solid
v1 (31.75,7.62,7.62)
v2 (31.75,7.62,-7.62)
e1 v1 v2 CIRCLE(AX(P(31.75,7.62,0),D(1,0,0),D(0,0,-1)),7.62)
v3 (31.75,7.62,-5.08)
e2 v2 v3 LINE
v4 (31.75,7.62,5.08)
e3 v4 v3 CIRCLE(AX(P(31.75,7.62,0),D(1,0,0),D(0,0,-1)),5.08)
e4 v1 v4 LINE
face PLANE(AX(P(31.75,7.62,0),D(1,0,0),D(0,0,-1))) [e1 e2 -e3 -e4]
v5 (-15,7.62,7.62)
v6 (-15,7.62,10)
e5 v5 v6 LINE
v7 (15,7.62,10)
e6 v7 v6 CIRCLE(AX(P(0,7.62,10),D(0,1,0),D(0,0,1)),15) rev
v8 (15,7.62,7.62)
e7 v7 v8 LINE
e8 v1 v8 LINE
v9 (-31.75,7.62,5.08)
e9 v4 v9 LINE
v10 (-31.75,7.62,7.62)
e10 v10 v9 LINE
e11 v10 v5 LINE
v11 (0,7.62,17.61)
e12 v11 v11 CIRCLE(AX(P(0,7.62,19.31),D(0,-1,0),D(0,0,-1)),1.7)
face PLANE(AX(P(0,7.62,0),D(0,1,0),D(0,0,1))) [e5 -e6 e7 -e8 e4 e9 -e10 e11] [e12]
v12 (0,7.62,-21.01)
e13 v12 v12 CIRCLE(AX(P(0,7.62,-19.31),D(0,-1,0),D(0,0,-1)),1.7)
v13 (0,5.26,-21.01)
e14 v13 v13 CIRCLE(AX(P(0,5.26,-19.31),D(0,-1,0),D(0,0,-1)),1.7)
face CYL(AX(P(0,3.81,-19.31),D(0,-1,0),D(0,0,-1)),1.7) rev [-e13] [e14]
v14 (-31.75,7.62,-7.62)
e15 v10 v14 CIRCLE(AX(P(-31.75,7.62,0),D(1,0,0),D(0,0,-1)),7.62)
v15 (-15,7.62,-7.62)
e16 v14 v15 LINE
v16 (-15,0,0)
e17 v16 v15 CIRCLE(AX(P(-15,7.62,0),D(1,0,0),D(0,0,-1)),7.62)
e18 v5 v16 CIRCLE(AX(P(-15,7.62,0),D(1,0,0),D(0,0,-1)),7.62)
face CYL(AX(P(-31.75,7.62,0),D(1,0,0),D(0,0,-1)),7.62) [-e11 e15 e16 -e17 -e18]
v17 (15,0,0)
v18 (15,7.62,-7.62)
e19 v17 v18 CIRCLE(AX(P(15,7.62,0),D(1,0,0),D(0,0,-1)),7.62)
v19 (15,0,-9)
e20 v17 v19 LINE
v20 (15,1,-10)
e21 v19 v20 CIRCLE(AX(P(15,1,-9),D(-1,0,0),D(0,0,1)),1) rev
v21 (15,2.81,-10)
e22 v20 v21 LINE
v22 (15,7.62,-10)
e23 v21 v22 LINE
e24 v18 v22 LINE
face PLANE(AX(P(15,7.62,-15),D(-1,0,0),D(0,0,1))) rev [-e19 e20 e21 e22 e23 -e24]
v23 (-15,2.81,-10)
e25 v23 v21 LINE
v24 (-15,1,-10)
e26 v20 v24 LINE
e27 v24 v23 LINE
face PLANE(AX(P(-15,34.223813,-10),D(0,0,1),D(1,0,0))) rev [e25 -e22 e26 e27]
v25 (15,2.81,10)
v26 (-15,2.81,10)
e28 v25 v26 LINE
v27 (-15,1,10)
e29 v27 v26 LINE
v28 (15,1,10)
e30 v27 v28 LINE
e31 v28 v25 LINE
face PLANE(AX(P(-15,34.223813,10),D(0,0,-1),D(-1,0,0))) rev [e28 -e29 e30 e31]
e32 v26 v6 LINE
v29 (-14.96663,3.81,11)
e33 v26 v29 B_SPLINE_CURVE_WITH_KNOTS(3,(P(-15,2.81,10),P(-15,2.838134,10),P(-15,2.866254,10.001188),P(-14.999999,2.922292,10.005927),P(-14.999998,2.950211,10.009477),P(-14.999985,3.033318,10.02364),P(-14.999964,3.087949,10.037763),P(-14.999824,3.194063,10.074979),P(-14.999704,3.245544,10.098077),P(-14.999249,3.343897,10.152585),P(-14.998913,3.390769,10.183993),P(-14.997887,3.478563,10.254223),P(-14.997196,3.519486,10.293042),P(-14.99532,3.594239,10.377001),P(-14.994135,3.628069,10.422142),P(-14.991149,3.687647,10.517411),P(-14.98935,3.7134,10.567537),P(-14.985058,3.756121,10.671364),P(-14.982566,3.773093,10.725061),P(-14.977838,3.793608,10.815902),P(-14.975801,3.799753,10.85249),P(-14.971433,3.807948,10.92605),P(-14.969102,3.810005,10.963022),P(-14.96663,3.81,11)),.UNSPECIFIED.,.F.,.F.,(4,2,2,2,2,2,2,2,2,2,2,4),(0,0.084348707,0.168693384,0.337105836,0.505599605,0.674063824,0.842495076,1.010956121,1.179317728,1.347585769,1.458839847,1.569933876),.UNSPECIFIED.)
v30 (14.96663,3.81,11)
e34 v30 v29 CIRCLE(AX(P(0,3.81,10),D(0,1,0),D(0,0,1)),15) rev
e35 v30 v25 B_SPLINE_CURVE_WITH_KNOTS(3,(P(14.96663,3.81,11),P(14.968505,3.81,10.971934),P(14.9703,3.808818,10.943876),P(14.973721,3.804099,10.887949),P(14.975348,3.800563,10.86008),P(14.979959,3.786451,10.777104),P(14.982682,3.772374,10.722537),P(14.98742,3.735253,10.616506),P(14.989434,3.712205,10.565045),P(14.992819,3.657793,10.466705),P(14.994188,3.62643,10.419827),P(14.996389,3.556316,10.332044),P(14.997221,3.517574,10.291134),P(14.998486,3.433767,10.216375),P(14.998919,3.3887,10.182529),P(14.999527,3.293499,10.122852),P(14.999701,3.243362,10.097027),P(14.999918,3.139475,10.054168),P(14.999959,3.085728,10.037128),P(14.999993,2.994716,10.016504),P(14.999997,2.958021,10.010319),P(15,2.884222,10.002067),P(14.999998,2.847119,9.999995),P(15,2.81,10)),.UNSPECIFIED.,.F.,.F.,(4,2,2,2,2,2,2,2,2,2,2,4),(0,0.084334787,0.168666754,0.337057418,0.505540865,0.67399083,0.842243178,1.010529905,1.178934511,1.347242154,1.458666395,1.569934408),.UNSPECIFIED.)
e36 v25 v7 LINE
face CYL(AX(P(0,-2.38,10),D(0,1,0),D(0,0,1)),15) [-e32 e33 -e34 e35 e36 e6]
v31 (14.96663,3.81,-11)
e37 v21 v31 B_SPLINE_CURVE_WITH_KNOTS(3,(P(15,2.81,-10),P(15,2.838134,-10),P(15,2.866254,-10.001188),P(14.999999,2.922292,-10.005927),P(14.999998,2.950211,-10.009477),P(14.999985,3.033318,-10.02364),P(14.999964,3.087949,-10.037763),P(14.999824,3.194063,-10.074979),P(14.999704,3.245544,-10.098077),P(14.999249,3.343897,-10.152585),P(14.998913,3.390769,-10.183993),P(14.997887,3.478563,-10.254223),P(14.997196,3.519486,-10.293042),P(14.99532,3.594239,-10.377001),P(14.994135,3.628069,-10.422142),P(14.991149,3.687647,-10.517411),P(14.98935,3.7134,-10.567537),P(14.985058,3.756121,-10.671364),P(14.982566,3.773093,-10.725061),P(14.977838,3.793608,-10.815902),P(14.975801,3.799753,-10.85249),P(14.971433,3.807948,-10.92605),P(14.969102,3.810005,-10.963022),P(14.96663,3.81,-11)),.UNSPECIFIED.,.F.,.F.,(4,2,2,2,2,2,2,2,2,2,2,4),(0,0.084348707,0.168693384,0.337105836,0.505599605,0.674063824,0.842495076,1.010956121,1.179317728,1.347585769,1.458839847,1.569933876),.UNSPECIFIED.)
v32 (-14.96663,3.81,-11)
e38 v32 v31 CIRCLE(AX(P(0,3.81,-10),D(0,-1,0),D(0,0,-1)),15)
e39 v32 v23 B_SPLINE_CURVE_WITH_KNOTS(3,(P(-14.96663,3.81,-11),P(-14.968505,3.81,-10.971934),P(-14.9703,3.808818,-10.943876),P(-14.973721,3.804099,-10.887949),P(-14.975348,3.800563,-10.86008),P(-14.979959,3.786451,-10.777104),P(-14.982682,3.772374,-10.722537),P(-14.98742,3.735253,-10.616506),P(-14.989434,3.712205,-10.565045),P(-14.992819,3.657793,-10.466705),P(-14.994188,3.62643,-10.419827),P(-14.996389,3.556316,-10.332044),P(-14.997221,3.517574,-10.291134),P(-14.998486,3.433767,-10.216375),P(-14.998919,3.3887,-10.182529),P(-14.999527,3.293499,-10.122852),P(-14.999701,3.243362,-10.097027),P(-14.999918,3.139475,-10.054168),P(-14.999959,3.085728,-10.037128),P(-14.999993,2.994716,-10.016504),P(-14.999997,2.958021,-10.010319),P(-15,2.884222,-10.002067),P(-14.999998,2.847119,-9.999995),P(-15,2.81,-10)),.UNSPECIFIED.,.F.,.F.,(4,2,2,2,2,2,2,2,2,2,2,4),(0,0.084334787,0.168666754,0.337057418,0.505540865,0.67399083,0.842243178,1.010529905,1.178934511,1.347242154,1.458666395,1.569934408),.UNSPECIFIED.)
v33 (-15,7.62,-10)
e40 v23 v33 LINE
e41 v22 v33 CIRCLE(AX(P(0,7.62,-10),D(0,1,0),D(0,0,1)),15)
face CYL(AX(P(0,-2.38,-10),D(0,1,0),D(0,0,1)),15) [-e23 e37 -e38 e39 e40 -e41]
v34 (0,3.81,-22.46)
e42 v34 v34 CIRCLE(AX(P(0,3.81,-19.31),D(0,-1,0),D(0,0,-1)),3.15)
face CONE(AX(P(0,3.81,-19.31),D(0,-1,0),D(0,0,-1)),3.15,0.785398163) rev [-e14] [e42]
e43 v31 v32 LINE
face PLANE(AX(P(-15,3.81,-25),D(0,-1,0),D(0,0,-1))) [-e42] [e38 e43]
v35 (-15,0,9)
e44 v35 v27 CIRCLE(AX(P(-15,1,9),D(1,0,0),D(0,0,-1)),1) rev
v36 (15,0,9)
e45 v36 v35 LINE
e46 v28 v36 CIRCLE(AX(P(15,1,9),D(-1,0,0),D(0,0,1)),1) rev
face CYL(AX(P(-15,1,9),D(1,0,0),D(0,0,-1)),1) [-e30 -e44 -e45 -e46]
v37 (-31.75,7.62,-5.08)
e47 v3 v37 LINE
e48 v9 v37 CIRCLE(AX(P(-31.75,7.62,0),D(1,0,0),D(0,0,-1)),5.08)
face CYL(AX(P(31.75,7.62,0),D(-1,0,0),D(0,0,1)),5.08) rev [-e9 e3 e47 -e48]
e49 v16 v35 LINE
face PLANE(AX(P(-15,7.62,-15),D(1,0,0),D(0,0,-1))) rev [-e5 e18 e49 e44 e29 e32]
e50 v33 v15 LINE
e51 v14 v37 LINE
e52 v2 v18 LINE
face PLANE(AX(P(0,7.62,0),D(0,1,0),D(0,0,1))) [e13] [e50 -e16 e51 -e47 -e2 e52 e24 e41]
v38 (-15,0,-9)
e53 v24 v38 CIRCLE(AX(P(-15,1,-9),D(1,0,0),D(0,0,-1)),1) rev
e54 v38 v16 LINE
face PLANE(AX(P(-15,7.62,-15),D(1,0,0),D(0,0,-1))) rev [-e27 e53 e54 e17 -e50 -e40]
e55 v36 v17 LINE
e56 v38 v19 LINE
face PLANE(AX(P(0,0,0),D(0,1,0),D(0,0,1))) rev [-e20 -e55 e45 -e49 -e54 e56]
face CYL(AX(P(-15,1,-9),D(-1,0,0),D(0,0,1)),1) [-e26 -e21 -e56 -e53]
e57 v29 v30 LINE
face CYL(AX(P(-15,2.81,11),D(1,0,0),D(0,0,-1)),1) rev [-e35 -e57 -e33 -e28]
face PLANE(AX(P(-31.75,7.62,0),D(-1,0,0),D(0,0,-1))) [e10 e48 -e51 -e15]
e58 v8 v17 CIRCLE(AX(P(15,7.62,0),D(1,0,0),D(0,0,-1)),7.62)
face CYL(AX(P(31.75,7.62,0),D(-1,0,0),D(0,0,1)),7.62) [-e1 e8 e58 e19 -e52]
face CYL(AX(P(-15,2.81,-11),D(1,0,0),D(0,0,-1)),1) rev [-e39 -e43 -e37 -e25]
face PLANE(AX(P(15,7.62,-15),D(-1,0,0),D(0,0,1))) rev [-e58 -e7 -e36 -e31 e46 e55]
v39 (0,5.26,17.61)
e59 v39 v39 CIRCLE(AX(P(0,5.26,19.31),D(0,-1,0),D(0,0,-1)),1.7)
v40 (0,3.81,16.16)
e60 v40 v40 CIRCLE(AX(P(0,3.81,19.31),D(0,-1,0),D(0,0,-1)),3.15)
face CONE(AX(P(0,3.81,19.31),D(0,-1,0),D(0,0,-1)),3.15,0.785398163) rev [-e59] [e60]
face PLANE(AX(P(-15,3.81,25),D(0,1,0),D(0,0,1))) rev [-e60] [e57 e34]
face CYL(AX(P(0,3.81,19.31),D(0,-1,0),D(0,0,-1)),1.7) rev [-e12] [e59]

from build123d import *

# Parameters (mm, degrees)
SKETCH1_W                                           = 30
SKETCH1_H                                           = 30
BOSS_EXTRUDE1_DEPTH                                 = 7.62
BOSS_EXTRUDE2_DEPTH                                 = 16.75
CUT_EXTRUDE2_DEPTH                                  = 35.39570322
SKETCH3_W                                           = 30
SKETCH3_H                                           = 3.81
BOSS_EXTRUDE3_DEPTH                                 = 10
CSK_FOR_M3_COUNTERSUNK_FLAT_HEAD_SCREW1_D           = 3.4
CSK_FOR_M3_COUNTERSUNK_FLAT_HEAD_SCREW1_CSINK_D     = 6.3
CSK_FOR_M3_COUNTERSUNK_FLAT_HEAD_SCREW1_CSINK_ANGLE = 90
CUT_EXTRUDE3_START                                  = -10
CUT_EXTRUDE3_DEPTH                                  = 52.123313339
SKETCH6_W                                           = 30
SKETCH6_H                                           = 5
CUT_EXTRUDE5_DEPTH                                  = 3.81
FILLET1_R                                           = 1


with BuildPart() as part:
    # Sketch1 → Boss-Extrude1 (new body)
    with BuildSketch(Plane(origin=(0, 0, 0), x_dir=(1, 0, 0), z_dir=(0, 1, 0))):
        Rectangle(SKETCH1_W, SKETCH1_H)
    extrude(amount=BOSS_EXTRUDE1_DEPTH)

    # Sketch2 → Boss-Extrude2 (add)
    with BuildSketch(Plane(origin=(15, 0, 0), x_dir=(0, 0, -1), z_dir=(1, 0, 0))):
        with BuildLine():
            Line((-7.62, 7.62), (-5.08, 7.62))
            ThreePointArc((-5.08, 7.62), (0, 2.54), (5.08, 7.62))
            Line((5.08, 7.62), (7.62, 7.62))
            ThreePointArc((7.62, 7.62), (0, 0), (-7.62, 7.62))
        make_face()
    boss_extrude2 = extrude(amount=BOSS_EXTRUDE2_DEPTH)

    # Sketch2<4> → Cut-Extrude2 (cut, through all)
    with BuildSketch(Plane(origin=(15, 0, 0), x_dir=(0, 0, -1), z_dir=(1, 0, 0))):
        with BuildLine():
            Line((5.08, 7.62), (-5.08, 7.62))
            ThreePointArc((-5.08, 7.62), (0, 2.54), (5.08, 7.62))
        make_face()
    extrude(amount=-CUT_EXTRUDE2_DEPTH, mode=Mode.SUBTRACT)

    # Mirror1: Boss-Extrude2 across plane
    add(boss_extrude2.mirror(Plane(origin=(0, 0, 0), x_dir=(0, 0, 1), z_dir=(1, 0, 0))))

    # Sketch3 → Boss-Extrude3 (add)
    with BuildSketch(Plane.XY.offset(15)):
        with Locations((0, 5.715)):
            Rectangle(SKETCH3_W, SKETCH3_H)
    boss_extrude3 = extrude(amount=BOSS_EXTRUDE3_DEPTH)

    # CSK for M3 Countersunk Flat Head Screw1 (through all)
    with Locations(Plane(origin=(0, 3.81, 19.31), x_dir=(0, 0, -1), z_dir=(0, -1, 0))):
        with Locations((0, 0)):
            csk_for_m3_countersunk_flat_head_screw1 = CounterSinkHole(CSK_FOR_M3_COUNTERSUNK_FLAT_HEAD_SCREW1_D / 2, CSK_FOR_M3_COUNTERSUNK_FLAT_HEAD_SCREW1_CSINK_D / 2, counter_sink_angle=CSK_FOR_M3_COUNTERSUNK_FLAT_HEAD_SCREW1_CSINK_ANGLE)

    # Sketch4 → Cut-Extrude3 (cut)
    with BuildSketch(Plane(origin=(0, 7.62, 0), x_dir=(1, 0, 0), z_dir=(0, 1, 0)).offset(CUT_EXTRUDE3_START)):
        with BuildLine():
            Line((-15, -25), (-1.2e-08, -25))
            ThreePointArc((-1.2e-08, -25), (-10.606601722, -20.606601713), (-15, -10))
            Line((-15, -10), (-15, -25))
        make_face()
        with BuildLine():
            Line((15, -25), (15, -10))
            ThreePointArc((15, -10), (10.606601713, -20.606601722), (-1.2e-08, -25))
            Line((-1.2e-08, -25), (15, -25))
        make_face()
    cut_extrude3 = extrude(amount=CUT_EXTRUDE3_DEPTH, mode=Mode.SUBTRACT)

    # Mirror2: Boss-Extrude3, CSK for M3 Countersunk Flat Head Screw1, Cut-Extrude3 across plane
    add(boss_extrude3.mirror(Plane.XY))
    add(csk_for_m3_countersunk_flat_head_screw1.mirror(Plane.XY), mode=Mode.SUBTRACT)
    add(cut_extrude3.mirror(Plane.XY), mode=Mode.SUBTRACT)

    # Sketch6 → Cut-Extrude5 (cut)
    with BuildSketch(Plane.XZ):
        with Locations((0, 12.5)):
            Rectangle(SKETCH6_W, SKETCH6_H)
        with Locations((0, -12.5)):
            Rectangle(SKETCH6_W, SKETCH6_H)
    extrude(amount=-CUT_EXTRUDE5_DEPTH, mode=Mode.SUBTRACT)

    # Fillet1
    # the kernel refuses this fillet: 1 mm, written as the material it adds along each edge
    with BuildSketch(Plane(origin=(-17.5, 3.81, 10), x_dir=(0, 0, 1), z_dir=(1, 0, 0))) as fillet1_piece_1_section:
        with BuildLine():
            CenterArc((FILLET1_R, FILLET1_R), FILLET1_R, 180, 90)
            Line((0, FILLET1_R), (0, 0))
            Line((0, 0), (FILLET1_R, 0))
        make_face()
    fillet1_piece_1 = extrude(amount=35, mode=Mode.PRIVATE)
    fillet1_piece_1 = fillet1_piece_1 & Plane(origin=(0, 3.58660625, 10), x_dir=(-8.322182034394214e-10, 0, 1.0), z_dir=(0, -1, 0)) * Cylinder(15, 74, mode=Mode.PRIVATE)
    add(fillet1_piece_1)
    with BuildSketch(Plane(origin=(-17.5, 3.81, -10), x_dir=(0, 0, -1), z_dir=(1, 0, 0))) as fillet1_piece_2_section:
        with BuildLine():
            CenterArc((FILLET1_R, -FILLET1_R), FILLET1_R, 90, 90)
            Line((0, -FILLET1_R), (0, 0))
            Line((0, 0), (FILLET1_R, 0))
        make_face()
    fillet1_piece_2 = extrude(amount=35, mode=Mode.PRIVATE)
    fillet1_piece_2 = fillet1_piece_2 & Plane(origin=(0, 3.586606238, -10), x_dir=(1, 0, 0), z_dir=(0, -1, 0)) * Cylinder(15, 74, mode=Mode.PRIVATE)
    add(fillet1_piece_2)
    # the kernel refuses this fillet: 1 mm, written as the material it takes off along each edge
    with BuildSketch(Plane(origin=(-17.5, 0, 10), x_dir=(0, 1, 0), z_dir=(1, 0, 0)), Plane(origin=(-17.5, 0, -10), x_dir=(0, 0, 1), z_dir=(1, 0, 0))) as fillet1_2_piece_1:
        with BuildLine():
            CenterArc((FILLET1_R, -FILLET1_R), FILLET1_R, 90, 90)
            Line((0, -FILLET1_R), (0, 0))
            Line((0, 0), (FILLET1_R, 0))
        make_face()
    extrude(amount=35, mode=Mode.SUBTRACT)


solid = part.part
